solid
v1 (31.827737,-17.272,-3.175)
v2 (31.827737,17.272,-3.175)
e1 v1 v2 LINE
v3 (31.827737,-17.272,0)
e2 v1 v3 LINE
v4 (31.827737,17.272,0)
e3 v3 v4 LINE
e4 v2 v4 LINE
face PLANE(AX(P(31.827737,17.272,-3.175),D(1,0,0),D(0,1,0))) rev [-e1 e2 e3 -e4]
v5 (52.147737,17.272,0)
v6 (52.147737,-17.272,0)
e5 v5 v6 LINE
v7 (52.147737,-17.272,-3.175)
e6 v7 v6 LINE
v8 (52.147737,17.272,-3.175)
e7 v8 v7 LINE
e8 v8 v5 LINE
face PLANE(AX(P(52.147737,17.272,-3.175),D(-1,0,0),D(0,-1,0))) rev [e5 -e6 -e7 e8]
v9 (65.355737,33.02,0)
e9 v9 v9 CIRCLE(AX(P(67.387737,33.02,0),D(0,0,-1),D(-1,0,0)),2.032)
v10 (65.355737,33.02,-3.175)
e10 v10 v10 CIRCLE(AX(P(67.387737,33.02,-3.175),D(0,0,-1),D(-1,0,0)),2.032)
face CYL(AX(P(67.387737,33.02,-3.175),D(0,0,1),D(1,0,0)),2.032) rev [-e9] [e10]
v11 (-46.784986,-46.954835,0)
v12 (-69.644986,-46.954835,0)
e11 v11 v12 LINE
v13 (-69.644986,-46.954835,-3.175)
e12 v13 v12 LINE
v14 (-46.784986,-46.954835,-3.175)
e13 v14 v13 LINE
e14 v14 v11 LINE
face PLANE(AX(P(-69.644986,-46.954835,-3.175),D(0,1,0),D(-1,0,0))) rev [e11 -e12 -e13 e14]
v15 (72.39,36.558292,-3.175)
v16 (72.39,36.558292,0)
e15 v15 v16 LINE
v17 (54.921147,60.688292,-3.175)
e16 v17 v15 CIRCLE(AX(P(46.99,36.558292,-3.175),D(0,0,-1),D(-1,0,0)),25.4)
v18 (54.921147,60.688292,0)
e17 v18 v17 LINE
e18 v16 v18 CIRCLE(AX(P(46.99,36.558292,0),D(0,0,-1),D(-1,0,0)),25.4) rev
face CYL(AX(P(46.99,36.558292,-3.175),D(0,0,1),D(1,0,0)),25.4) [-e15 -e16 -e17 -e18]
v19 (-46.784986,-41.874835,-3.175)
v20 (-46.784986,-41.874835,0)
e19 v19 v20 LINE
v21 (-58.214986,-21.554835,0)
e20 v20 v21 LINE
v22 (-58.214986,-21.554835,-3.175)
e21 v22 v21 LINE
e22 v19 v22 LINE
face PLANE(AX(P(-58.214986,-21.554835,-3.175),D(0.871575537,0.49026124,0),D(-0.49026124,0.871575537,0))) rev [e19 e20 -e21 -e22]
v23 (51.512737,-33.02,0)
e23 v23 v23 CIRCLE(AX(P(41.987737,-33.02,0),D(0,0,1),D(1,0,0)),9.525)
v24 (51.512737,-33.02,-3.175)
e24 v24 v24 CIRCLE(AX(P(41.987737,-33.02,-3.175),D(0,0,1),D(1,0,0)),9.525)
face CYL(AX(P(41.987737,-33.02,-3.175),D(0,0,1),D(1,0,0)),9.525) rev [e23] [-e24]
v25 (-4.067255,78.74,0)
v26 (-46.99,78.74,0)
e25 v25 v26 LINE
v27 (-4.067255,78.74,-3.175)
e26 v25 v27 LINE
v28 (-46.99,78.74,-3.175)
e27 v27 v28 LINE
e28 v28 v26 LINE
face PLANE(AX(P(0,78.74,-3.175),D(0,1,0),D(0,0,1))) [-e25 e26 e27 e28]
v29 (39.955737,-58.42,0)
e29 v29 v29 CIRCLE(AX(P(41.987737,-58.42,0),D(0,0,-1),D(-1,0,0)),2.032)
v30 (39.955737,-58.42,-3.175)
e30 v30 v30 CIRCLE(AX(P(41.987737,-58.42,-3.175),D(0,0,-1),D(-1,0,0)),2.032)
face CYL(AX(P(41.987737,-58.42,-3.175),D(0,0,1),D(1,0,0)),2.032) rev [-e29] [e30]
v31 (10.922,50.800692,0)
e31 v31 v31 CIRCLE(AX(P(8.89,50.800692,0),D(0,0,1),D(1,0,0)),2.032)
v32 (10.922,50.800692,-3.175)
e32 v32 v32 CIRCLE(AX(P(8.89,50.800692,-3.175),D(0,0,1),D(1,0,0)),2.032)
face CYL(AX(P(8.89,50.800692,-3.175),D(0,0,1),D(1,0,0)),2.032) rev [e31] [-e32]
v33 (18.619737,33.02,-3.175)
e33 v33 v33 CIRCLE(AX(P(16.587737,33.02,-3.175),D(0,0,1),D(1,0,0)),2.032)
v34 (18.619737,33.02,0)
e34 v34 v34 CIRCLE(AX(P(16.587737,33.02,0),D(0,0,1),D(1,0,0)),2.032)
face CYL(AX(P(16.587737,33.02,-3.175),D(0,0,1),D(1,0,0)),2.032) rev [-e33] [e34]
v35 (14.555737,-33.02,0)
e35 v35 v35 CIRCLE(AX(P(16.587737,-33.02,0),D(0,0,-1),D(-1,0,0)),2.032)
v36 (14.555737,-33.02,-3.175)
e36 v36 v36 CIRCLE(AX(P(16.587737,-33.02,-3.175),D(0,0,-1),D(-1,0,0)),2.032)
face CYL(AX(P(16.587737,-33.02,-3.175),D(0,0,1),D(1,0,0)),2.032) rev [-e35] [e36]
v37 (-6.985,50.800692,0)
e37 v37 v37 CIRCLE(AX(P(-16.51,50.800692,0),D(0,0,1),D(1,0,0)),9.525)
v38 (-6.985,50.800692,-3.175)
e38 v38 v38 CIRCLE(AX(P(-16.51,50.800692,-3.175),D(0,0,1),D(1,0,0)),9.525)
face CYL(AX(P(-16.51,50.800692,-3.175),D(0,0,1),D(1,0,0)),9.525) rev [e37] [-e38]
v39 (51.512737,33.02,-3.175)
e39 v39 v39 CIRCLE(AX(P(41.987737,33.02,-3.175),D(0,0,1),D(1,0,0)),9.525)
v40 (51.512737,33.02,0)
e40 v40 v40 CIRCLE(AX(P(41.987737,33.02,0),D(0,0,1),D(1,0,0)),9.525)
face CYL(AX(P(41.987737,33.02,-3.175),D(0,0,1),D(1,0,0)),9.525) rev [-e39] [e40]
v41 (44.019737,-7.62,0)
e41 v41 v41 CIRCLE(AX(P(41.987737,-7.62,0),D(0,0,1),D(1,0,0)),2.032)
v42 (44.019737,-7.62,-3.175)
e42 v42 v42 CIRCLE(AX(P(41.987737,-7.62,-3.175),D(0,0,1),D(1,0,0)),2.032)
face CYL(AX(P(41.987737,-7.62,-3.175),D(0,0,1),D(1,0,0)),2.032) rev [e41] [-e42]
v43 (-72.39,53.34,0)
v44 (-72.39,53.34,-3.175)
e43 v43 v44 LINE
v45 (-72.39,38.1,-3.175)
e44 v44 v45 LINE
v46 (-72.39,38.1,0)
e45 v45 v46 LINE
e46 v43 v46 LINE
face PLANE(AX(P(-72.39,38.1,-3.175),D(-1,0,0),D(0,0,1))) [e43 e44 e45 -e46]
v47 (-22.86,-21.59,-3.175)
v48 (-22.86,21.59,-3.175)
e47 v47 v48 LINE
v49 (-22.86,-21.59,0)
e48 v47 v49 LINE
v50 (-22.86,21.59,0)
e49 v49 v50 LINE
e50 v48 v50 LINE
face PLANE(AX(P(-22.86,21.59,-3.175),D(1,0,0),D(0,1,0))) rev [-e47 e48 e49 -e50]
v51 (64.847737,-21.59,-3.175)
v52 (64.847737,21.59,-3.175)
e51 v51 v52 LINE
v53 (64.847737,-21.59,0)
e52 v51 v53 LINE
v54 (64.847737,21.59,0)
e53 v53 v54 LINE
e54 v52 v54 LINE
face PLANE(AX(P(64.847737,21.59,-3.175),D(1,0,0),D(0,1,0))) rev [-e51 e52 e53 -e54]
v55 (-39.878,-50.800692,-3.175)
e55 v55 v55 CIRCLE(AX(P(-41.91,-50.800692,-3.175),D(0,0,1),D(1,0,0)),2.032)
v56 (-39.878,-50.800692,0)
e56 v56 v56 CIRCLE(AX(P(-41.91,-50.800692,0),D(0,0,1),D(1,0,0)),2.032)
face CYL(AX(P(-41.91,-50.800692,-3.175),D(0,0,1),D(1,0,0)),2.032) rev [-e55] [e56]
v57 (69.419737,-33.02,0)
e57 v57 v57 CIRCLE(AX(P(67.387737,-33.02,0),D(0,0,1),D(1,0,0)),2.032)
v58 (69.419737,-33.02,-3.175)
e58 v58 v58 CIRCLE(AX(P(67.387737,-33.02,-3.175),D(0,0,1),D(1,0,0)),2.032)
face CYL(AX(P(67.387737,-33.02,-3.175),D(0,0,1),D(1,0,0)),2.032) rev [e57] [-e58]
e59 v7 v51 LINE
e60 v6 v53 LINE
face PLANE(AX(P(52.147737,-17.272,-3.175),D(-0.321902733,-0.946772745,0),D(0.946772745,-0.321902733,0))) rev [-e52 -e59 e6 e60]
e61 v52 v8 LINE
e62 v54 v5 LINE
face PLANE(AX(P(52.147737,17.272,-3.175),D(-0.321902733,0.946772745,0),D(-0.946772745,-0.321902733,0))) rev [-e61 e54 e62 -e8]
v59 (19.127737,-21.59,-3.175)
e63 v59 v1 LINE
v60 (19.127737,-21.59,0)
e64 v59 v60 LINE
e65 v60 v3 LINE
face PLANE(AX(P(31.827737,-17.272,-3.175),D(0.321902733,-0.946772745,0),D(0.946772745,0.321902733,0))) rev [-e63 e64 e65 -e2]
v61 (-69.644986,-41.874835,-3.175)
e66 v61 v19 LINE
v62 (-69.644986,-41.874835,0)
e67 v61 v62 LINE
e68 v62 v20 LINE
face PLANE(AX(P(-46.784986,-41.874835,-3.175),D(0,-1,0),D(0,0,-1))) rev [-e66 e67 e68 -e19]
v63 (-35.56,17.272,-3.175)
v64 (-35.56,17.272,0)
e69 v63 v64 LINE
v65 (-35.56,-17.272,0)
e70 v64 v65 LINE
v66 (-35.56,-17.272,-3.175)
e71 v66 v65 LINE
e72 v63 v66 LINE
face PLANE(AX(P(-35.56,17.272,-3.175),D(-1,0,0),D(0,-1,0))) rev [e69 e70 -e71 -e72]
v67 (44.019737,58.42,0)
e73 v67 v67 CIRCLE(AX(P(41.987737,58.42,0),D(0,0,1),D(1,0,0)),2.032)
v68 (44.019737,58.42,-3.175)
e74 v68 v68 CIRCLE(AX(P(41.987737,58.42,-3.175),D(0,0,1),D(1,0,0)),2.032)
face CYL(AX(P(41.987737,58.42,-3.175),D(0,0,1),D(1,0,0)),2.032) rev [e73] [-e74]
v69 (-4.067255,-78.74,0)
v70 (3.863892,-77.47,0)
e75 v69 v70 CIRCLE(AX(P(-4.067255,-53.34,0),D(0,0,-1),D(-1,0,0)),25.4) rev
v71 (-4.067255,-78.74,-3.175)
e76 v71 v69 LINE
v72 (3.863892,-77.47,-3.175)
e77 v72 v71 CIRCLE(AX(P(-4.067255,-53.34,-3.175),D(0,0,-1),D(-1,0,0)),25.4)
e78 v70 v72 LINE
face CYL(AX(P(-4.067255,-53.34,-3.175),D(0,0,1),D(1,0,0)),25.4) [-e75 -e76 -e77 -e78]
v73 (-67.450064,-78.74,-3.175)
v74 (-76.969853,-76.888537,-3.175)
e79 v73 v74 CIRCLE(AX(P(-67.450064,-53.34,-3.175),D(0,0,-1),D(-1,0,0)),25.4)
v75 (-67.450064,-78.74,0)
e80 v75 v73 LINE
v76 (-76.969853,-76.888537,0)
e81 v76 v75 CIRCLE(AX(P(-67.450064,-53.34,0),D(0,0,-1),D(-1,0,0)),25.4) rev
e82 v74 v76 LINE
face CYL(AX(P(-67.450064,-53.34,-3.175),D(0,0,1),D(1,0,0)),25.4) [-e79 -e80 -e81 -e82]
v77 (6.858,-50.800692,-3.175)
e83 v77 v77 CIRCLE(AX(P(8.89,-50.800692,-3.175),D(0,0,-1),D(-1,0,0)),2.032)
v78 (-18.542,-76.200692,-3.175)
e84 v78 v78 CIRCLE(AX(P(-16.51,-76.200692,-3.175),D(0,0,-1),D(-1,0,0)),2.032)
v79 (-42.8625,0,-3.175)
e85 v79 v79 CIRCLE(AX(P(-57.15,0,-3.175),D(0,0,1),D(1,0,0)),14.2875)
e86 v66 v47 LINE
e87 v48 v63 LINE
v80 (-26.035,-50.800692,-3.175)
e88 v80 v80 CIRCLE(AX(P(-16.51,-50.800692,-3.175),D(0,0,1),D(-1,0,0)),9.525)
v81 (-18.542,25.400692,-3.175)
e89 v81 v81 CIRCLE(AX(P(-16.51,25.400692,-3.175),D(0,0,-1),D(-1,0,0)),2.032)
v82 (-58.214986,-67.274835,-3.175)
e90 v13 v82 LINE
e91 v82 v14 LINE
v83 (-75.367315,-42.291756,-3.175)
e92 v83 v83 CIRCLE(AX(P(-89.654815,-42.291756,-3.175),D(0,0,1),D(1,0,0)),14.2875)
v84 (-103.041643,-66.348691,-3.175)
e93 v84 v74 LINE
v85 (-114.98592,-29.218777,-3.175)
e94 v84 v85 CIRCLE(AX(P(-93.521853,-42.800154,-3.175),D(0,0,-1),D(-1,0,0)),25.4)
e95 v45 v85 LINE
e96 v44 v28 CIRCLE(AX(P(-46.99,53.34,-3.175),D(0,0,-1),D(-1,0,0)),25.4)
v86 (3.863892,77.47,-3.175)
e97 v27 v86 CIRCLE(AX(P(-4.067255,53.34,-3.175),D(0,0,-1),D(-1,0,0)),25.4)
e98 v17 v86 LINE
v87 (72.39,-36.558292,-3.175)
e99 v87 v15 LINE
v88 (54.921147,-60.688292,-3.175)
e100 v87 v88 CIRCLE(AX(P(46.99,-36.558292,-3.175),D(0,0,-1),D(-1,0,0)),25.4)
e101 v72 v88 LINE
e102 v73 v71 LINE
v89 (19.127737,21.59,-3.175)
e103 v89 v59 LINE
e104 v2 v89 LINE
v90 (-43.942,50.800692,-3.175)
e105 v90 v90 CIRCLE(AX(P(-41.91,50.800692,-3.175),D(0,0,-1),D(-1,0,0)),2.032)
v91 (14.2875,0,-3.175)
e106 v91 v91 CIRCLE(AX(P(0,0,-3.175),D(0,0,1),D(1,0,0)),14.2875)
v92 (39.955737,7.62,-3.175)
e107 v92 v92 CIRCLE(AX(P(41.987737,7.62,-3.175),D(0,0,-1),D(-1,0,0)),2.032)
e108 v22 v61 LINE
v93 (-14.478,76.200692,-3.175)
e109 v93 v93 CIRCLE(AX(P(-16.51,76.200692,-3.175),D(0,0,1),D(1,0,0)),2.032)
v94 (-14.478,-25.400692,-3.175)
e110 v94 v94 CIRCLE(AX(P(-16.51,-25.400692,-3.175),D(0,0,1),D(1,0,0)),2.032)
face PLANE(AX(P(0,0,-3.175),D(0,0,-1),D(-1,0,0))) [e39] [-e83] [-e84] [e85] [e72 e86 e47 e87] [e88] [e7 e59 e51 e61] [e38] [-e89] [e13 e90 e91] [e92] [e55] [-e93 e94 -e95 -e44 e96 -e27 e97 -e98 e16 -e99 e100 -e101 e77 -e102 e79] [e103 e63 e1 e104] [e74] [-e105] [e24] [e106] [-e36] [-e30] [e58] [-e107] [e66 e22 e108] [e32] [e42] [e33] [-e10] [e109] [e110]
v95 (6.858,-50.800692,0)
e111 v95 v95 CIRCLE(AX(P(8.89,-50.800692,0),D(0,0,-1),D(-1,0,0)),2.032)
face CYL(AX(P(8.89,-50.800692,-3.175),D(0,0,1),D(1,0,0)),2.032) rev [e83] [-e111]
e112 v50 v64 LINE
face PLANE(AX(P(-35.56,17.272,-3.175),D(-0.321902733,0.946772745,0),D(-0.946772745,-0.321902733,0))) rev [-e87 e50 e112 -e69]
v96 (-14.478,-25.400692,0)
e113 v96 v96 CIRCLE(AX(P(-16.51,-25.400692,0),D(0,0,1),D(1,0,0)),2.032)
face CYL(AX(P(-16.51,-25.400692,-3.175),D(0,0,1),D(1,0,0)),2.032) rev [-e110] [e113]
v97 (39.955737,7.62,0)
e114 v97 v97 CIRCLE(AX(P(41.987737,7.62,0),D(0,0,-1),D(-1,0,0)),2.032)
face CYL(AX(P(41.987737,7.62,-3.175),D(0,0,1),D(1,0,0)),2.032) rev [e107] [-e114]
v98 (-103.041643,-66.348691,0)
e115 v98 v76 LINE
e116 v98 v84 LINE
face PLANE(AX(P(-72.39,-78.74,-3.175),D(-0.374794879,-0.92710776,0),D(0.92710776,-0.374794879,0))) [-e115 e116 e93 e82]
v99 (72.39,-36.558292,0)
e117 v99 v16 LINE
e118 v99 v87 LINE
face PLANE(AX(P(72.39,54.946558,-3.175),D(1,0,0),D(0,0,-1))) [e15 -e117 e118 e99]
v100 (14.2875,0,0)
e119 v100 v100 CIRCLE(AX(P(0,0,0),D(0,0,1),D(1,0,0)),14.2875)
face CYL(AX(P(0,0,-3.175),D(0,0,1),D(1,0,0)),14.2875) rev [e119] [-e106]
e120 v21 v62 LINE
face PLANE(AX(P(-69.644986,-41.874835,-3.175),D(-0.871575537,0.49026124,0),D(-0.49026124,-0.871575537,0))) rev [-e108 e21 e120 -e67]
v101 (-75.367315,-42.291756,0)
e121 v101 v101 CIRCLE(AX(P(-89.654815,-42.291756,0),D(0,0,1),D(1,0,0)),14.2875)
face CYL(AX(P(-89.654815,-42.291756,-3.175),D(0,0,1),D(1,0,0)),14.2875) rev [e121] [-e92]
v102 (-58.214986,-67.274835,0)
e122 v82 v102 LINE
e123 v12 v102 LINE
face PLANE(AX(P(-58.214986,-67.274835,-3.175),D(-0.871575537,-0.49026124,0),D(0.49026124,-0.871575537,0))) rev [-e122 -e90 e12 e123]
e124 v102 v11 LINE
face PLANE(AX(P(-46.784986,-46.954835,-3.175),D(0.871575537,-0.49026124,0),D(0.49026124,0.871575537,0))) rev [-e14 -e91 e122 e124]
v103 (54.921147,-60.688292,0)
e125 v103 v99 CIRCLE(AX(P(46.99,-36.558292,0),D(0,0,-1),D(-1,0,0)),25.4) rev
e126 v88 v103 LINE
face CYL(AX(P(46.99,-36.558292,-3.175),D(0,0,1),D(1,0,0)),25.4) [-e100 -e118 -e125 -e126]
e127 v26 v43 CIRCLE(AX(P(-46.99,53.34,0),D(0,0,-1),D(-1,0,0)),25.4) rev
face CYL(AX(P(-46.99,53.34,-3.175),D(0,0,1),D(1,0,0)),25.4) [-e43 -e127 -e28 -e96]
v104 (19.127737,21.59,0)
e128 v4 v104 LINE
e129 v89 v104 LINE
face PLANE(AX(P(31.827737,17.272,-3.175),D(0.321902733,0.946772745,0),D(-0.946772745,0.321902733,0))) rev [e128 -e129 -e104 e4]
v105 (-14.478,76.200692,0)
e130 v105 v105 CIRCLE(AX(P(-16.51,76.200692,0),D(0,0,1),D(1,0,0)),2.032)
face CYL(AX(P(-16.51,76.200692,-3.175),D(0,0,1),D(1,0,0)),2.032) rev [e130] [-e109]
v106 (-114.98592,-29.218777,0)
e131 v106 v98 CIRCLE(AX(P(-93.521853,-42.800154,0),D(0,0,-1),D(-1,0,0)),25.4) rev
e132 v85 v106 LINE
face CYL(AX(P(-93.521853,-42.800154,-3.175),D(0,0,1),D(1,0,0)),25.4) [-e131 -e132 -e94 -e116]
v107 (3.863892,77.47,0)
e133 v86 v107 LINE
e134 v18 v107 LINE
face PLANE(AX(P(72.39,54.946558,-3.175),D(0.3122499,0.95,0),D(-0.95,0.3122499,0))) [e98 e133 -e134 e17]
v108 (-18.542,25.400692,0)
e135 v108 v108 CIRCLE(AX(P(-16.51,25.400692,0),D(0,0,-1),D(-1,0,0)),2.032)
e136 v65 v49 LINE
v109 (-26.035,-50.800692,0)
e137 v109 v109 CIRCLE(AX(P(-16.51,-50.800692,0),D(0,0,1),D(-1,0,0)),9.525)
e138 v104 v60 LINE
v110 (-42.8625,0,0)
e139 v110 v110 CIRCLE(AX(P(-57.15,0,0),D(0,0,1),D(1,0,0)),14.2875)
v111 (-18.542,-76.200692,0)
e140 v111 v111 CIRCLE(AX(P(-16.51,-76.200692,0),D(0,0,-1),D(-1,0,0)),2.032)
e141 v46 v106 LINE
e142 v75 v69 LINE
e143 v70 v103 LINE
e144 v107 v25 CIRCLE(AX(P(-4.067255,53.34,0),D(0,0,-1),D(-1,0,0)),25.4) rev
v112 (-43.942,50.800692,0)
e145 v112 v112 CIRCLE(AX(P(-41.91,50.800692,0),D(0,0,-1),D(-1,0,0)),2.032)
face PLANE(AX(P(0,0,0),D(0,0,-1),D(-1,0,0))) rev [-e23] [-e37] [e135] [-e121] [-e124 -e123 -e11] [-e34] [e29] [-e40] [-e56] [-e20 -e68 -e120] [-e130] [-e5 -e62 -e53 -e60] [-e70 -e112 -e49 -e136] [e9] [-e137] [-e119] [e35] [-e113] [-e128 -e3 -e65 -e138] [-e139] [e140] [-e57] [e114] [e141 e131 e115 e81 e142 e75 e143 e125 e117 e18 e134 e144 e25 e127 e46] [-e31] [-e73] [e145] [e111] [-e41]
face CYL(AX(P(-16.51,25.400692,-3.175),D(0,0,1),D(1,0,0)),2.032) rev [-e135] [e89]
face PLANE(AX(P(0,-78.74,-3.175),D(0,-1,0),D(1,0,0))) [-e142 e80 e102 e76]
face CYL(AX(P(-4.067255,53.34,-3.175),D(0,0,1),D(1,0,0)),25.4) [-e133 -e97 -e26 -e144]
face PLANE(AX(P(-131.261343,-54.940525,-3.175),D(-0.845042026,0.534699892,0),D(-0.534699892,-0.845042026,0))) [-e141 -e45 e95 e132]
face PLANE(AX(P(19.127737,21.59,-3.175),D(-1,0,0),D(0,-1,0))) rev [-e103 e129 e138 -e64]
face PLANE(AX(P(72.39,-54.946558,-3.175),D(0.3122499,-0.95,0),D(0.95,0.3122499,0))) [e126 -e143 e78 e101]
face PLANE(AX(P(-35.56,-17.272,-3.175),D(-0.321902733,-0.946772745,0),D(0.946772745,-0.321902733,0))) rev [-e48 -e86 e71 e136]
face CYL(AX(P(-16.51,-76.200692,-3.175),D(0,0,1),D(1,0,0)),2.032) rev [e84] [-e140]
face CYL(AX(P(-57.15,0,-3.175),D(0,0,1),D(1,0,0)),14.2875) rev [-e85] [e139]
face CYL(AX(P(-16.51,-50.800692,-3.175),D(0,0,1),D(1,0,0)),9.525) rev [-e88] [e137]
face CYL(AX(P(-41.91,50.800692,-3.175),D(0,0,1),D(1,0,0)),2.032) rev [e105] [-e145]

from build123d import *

# Parameters (mm, degrees)
SKETCH1_R           = 14.2875
SKETCH1_R_2         = 9.525
BASE_FLANGE1_DEPTH  = 3.175
SKETCH2_R           = 2.032
CUT_EXTRUDE1_DEPTH  = 3.175
BREAK_CORNER1_START = -3.175
BREAK_CORNER1_DEPTH = 3.175
CUT_EXTRUDE2_DEPTH  = 3.175


# Read off the part's stored shape, not the designer's step: Break-Corner1
# Sheet-metal steps are written as plain solids
with BuildPart() as part:
    # Sketch1 → Base-Flange1 (new body)
    with BuildSketch(Plane.XY):
        Polygon((-72.39, 38.1), (-72.39, 78.74), (0, 78.74), (72.39, 54.946557626), (72.39, -54.946557626), (0, -78.74), (-72.39, -78.74), (-131.261342758, -54.940525177), align=None)
        Circle(SKETCH1_R, mode=Mode.SUBTRACT)
        with Locations((-16.51, 50.800692145)):
            Circle(SKETCH1_R_2, mode=Mode.SUBTRACT)
        with Locations(Location((-16.51, -50.800692145, 0), (0, 0, 180))):
            Circle(SKETCH1_R_2, mode=Mode.SUBTRACT)
        with Locations((-57.15, 0)):
            Circle(SKETCH1_R, mode=Mode.SUBTRACT)
        with Locations((-89.654815243, -42.291755533)):
            Circle(SKETCH1_R, mode=Mode.SUBTRACT)
        with Locations((41.987736572, 33.02)):
            Circle(SKETCH1_R_2, mode=Mode.SUBTRACT)
        with Locations((41.987736572, -33.02)):
            Circle(SKETCH1_R_2, mode=Mode.SUBTRACT)
    extrude(amount=-BASE_FLANGE1_DEPTH)

    # Sketch2 → Cut-Extrude1 (cut)
    with BuildSketch(Plane.XY):
        with Locations((-16.51, 76.200692145)):
            Circle(SKETCH2_R)
        with Locations((8.89, 50.800692145)):
            Circle(SKETCH2_R)
        with Locations(Location((-16.51, 25.400692145, 0), (0, 0, 180))):
            Circle(SKETCH2_R)
        with Locations(Location((-41.91, 50.800692145, 0), (0, 0, 180))):
            Circle(SKETCH2_R)
        with Locations((-41.91, -50.800692145)):
            Circle(SKETCH2_R)
        with Locations(Location((-16.51, -76.200692145, 0), (0, 0, 180))):
            Circle(SKETCH2_R)
        with Locations(Location((8.89, -50.800692145, 0), (0, 0, 180))):
            Circle(SKETCH2_R)
        with Locations((-16.51, -25.400692145)):
            Circle(SKETCH2_R)
        with Locations((41.987736572, 58.42)):
            Circle(SKETCH2_R)
        with Locations(Location((41.987736572, 7.62, 0), (0, 0, 180))):
            Circle(SKETCH2_R)
        with Locations((16.587736572, 33.02)):
            Circle(SKETCH2_R)
        with Locations(Location((67.387736572, 33.02, 0), (0, 0, 180))):
            Circle(SKETCH2_R)
        with Locations((41.987736572, -7.62)):
            Circle(SKETCH2_R)
        with Locations((67.387736572, -33.02)):
            Circle(SKETCH2_R)
        with Locations(Location((41.987736572, -58.42, 0), (0, 0, 180))):
            Circle(SKETCH2_R)
        with Locations(Location((16.587736572, -33.02, 0), (0, 0, 180))):
            Circle(SKETCH2_R)
    extrude(amount=-CUT_EXTRUDE1_DEPTH, mode=Mode.SUBTRACT)

    # Break-Corner1 outline → Break-Corner1 (cut)
    with BuildSketch(Plane.XY.offset(BREAK_CORNER1_START)):
        with BuildLine():
            ThreePointArc((-72.39, 53.34), (-64.950512242, 71.300512242), (-46.99, 78.74))
            Line((-46.99, 78.74), (-72.39, 78.74))
            Line((-72.39, 78.74), (-72.39, 53.34))
        make_face()
        with BuildLine():
            Line((0, 78.74), (-4.067255107, 78.74))
            ThreePointArc((-4.067255107, 78.74), (-0.051162479, 78.420490426), (3.863892351, 77.47))
            Line((3.863892351, 77.47), (0, 78.74))
        make_face()
        with BuildLine():
            ThreePointArc((-103.041642579, -66.34869106), (-117.701544329, -50.578489915), (-114.985920109, -29.218776702))
            Line((-114.985920109, -29.218776702), (-131.261342758, -54.940525177))
            Line((-131.261342758, -54.940525177), (-103.041642579, -66.34869106))
        make_face()
        with BuildLine():
            Line((72.39, 54.946557626), (54.921147458, 60.688291792))
            ThreePointArc((54.921147458, 60.688291792), (67.564391187, 51.453070316), (72.39, 36.558291792))
            Line((72.39, 36.558291792), (72.39, 54.946557626))
        make_face()
        with BuildLine():
            ThreePointArc((-67.450063518, -78.74), (-72.299143718, -78.27283821), (-76.969853447, -76.888537103))
            Line((-76.969853447, -76.888537103), (-72.39, -78.74))
            Line((-72.39, -78.74), (-67.450063518, -78.74))
        make_face()
        with BuildLine():
            Line((72.39, -54.946557626), (72.39, -36.558291792))
            ThreePointArc((72.39, -36.558291792), (67.564391187, -51.453070316), (54.921147458, -60.688291792))
            Line((54.921147458, -60.688291792), (72.39, -54.946557626))
        make_face()
        with BuildLine():
            ThreePointArc((3.863892351, -77.47), (-0.051162479, -78.420490426), (-4.067255107, -78.74))
            Line((-4.067255107, -78.74), (0, -78.74))
            Line((0, -78.74), (3.863892351, -77.47))
        make_face()
    extrude(amount=BREAK_CORNER1_DEPTH, mode=Mode.SUBTRACT)

    # Sketch3 → Cut-Extrude2 (cut)
    with BuildSketch(Plane.XY):
        Polygon((64.847736572, 21.59), (64.847736572, -21.59), (52.147736572, -17.272), (52.147736572, 17.272), align=None)
        Polygon((19.127736572, 21.59), (19.127736572, -21.59), (31.827736572, -17.272), (31.827736572, 17.272), align=None)
        Polygon((-35.56, -17.272), (-22.86, -21.59), (-22.86, 21.59), (-35.56, 17.272), align=None)
        Polygon((-58.214986183, -67.274834659), (-69.644986183, -46.954834659), (-46.784986183, -46.954834659), align=None)
        Polygon((-69.644986183, -41.874834659), (-58.214986183, -21.554834659), (-46.784986183, -41.874834659), align=None)
    extrude(amount=-CUT_EXTRUDE2_DEPTH, mode=Mode.SUBTRACT)


solid = part.part
